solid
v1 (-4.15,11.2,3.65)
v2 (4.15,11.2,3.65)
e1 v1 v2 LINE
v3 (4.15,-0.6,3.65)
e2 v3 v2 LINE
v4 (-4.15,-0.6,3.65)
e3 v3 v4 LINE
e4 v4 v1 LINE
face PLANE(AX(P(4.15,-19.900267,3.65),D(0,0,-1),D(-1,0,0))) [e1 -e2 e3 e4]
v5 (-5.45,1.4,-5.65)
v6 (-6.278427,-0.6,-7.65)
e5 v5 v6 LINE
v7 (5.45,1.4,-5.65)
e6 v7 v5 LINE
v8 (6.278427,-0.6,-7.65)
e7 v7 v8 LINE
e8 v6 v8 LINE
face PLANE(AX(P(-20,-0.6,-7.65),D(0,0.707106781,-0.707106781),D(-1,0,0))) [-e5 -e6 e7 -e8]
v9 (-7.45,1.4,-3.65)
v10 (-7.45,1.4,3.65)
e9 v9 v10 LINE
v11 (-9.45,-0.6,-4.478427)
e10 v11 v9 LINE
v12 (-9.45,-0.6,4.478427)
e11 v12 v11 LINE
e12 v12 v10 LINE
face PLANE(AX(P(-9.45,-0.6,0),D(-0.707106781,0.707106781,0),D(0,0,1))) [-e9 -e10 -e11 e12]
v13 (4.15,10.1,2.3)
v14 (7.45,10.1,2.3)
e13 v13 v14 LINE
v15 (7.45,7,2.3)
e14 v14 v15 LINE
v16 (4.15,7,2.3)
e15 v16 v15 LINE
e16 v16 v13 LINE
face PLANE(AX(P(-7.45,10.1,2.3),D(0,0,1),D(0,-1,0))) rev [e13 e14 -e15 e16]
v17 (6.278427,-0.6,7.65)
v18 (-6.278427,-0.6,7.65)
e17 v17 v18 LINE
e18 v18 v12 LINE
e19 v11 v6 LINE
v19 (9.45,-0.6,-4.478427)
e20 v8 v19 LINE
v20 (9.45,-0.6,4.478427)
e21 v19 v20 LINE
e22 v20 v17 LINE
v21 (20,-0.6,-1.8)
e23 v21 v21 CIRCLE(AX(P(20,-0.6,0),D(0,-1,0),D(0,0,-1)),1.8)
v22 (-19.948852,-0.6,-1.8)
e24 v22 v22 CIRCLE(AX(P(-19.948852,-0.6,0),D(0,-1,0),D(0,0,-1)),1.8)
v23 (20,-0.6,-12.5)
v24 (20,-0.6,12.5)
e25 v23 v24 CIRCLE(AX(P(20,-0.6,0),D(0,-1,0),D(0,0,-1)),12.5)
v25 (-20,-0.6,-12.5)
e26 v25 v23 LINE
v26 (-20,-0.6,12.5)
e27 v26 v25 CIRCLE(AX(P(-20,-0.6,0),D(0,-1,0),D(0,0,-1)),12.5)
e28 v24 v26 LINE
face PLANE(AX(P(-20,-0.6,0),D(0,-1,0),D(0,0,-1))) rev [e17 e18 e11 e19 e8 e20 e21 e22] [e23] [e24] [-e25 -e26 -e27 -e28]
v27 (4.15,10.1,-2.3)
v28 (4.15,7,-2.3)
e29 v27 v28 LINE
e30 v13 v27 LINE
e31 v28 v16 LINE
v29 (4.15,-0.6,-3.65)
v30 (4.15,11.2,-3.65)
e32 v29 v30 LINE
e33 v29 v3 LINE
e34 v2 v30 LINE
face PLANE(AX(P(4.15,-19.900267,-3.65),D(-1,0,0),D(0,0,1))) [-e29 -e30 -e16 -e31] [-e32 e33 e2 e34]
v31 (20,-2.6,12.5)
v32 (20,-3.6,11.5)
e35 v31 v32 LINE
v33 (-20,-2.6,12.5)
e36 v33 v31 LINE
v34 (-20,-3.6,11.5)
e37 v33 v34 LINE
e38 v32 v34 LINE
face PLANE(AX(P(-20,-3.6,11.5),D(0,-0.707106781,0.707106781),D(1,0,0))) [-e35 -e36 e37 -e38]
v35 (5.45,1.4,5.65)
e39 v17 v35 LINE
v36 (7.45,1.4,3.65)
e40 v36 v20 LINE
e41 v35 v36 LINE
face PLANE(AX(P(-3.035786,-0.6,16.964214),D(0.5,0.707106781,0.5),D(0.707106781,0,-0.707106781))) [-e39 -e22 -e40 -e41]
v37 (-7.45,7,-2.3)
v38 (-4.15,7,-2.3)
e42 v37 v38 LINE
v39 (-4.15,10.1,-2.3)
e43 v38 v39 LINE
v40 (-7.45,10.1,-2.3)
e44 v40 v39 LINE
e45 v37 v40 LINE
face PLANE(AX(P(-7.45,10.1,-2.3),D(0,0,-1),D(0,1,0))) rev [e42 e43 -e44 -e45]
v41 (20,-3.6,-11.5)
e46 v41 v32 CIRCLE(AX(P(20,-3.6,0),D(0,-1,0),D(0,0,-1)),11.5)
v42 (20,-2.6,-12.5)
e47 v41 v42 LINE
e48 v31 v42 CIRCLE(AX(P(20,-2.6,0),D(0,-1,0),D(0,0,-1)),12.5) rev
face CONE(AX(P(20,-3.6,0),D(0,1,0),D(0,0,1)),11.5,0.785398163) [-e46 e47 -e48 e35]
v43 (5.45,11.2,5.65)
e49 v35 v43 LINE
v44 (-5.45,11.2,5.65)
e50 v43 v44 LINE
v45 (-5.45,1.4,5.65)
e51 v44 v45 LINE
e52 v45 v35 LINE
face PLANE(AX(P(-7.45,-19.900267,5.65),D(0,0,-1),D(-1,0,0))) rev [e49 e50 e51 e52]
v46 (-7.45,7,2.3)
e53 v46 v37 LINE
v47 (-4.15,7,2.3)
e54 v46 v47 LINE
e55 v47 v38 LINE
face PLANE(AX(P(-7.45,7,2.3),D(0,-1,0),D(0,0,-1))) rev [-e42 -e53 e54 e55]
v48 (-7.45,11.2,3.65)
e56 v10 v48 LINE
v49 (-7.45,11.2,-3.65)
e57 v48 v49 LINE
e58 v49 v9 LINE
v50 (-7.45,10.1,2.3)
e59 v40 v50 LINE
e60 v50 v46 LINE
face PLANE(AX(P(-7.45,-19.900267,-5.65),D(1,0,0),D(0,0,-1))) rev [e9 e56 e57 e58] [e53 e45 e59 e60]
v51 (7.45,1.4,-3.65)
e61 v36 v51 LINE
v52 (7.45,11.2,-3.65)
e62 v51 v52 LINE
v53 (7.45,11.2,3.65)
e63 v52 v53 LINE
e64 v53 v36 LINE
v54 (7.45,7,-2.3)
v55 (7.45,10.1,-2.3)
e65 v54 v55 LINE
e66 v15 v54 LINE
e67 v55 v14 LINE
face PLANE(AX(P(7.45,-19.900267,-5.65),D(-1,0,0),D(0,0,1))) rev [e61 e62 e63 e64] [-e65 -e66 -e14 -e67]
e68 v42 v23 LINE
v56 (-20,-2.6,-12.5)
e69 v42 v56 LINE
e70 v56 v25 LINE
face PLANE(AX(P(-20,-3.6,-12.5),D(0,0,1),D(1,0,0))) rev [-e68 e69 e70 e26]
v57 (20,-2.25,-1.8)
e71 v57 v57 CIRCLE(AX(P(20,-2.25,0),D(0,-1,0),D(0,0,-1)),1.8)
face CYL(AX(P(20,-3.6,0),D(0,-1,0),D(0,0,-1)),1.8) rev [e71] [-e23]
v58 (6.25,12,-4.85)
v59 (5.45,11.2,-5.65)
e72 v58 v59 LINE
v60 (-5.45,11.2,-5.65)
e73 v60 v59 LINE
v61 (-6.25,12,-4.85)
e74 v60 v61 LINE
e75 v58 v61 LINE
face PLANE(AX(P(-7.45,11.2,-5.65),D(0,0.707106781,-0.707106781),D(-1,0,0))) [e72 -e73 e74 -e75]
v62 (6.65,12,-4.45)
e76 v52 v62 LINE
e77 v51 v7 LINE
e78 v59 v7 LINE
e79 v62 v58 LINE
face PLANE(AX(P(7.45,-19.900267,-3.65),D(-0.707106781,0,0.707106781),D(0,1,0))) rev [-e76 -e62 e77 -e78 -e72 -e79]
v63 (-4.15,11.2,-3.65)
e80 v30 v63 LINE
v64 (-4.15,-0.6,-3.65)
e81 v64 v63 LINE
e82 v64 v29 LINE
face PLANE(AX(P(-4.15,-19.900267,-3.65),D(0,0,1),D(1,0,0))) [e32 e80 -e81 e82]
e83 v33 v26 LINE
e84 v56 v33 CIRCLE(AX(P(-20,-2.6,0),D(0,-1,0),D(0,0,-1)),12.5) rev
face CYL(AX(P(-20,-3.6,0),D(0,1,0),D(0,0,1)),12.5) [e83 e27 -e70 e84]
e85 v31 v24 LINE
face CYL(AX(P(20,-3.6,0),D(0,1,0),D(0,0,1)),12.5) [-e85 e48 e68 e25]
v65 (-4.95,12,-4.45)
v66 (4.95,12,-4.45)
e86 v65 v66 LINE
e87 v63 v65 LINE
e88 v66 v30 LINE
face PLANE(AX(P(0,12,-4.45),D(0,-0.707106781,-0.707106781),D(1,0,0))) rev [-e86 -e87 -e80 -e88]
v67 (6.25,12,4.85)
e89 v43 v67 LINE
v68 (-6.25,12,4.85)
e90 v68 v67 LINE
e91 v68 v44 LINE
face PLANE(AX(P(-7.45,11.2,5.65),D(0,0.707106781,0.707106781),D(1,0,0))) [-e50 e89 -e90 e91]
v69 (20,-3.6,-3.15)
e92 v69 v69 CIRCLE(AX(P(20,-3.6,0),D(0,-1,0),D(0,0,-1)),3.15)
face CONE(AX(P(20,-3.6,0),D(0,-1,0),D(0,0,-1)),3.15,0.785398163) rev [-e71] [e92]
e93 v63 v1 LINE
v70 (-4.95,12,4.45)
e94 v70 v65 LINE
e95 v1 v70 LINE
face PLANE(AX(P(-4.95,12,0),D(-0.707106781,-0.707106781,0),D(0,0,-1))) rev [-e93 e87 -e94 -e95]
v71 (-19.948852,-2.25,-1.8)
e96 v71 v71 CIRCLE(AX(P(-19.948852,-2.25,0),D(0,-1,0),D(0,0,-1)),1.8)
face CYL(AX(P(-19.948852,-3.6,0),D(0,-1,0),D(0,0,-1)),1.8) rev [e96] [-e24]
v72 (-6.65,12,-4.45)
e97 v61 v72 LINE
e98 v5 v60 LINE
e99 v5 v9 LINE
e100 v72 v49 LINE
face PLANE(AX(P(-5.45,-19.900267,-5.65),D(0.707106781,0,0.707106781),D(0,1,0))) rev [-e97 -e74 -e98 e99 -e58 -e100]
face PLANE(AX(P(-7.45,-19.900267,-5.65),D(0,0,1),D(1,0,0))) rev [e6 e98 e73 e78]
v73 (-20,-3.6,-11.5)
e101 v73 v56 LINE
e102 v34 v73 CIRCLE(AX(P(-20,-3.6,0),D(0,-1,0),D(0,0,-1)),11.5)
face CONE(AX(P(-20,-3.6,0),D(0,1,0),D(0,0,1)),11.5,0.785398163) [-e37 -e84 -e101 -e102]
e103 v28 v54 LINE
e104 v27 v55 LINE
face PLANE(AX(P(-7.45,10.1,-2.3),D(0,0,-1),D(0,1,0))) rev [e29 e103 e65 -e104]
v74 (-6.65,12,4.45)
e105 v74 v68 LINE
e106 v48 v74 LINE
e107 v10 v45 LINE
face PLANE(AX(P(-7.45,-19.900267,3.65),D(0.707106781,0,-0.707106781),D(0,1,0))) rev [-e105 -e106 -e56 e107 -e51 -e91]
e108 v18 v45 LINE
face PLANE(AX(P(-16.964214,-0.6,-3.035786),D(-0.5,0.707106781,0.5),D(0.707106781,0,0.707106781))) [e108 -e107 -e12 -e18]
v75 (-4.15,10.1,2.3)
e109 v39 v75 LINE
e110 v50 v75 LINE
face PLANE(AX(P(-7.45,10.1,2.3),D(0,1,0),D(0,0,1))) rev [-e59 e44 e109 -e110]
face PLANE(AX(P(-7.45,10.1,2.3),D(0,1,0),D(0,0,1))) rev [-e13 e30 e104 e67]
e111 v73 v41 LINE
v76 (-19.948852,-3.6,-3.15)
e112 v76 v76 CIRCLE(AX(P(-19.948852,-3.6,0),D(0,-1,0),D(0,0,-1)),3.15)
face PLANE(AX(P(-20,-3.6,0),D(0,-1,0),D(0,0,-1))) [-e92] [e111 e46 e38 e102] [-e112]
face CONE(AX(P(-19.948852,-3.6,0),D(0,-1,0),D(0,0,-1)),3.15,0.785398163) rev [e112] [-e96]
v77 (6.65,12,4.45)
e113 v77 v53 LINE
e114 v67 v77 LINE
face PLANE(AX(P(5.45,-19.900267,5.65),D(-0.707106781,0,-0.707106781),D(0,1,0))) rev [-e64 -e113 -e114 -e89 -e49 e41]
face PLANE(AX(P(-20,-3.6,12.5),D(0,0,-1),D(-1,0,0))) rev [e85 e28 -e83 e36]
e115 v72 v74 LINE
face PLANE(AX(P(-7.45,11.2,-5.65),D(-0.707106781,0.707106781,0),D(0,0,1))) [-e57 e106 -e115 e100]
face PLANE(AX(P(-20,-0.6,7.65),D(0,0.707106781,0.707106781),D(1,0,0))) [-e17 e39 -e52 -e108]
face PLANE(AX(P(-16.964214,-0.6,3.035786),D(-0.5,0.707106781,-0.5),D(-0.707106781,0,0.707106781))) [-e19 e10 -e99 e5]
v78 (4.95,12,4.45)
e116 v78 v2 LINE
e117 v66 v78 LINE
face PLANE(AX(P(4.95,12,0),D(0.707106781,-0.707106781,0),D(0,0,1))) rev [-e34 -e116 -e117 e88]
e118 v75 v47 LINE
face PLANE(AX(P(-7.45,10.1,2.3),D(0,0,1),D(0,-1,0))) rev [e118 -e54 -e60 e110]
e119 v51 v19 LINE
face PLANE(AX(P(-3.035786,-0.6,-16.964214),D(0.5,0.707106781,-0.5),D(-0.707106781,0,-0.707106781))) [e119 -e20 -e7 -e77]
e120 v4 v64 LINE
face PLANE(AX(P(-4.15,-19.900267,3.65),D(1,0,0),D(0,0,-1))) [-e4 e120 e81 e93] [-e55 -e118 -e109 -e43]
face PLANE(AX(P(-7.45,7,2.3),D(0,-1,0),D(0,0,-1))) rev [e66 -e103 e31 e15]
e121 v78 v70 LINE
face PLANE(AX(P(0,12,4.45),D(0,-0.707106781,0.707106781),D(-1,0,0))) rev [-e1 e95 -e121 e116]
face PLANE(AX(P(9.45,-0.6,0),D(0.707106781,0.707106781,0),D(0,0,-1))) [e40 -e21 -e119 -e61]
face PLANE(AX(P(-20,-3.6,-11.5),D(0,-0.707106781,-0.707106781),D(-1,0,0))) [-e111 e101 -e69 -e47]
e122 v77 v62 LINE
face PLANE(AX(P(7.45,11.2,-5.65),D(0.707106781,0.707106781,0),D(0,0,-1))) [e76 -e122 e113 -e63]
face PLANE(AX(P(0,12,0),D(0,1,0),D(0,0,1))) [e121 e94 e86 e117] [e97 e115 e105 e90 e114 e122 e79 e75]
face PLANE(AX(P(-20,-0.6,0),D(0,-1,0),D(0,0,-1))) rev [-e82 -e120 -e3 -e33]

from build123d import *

# Parameters (mm, degrees)
SKETCH2_W                                       = 14.9
SKETCH2_H                                       = 11.3
SKETCH2_W_2                                     = 8.3
SKETCH2_H_2                                     = 7.3
BOSS_EXTRUDE1_DEPTH                             = 12.6
CUT_EXTRUDE1_DEPTH                              = 16.212659202
CUT_EXTRUDE1_DEPTH_BACK                         = 16.212659202
SKETCH4_W                                       = 4.6
SKETCH4_H                                       = 3.1
BOSS_EXTRUDE2_DEPTH                             = 3
CHAMFER1_SIZE                                   = 1
CHAMFER2_SIZE                                   = 0.8
CHAMFER3_SIZE                                   = 2
CSK_FOR_M3_FLAT_HEAD_MACHINE_SCREW1_D           = 3.6
CSK_FOR_M3_FLAT_HEAD_MACHINE_SCREW1_CSINK_D     = 6.3
CSK_FOR_M3_FLAT_HEAD_MACHINE_SCREW1_CSINK_ANGLE = 90
CHAMFER4_SIZE                                   = 2


with BuildPart() as part:
    # Sketch2 → Boss-Extrude1 (new body)
    with BuildSketch(Plane.XZ.offset(-12)):
        Rectangle(SKETCH2_W, SKETCH2_H)
        Rectangle(SKETCH2_W_2, SKETCH2_H_2, mode=Mode.SUBTRACT)
    extrude(amount=BOSS_EXTRUDE1_DEPTH)

    # Sketch4 → Cut-Extrude1 (cut, two sides: drawn at the far end of the back side and taken through both)
    with BuildSketch(Plane(origin=(0, 0, 0), x_dir=(0, 0, -1), z_dir=(1, 0, 0)).offset(-CUT_EXTRUDE1_DEPTH_BACK)):
        with Locations((0, 8.55)):
            Rectangle(SKETCH4_W, SKETCH4_H)
    extrude(amount=CUT_EXTRUDE1_DEPTH + CUT_EXTRUDE1_DEPTH_BACK, mode=Mode.SUBTRACT)

    # Sketch5 → Boss-Extrude2 (add)
    with BuildSketch(Plane.XZ.offset(0.6)):
        with BuildLine():
            Line((-20, 12.5), (20, 12.5))
            ThreePointArc((20, 12.5), (32.5, 0), (20, -12.5))
            Line((20, -12.5), (-20, -12.5))
            ThreePointArc((-20, -12.5), (-32.5, 0), (-20, 12.5))
        make_face()
    extrude(amount=BOSS_EXTRUDE2_DEPTH)

    # Chamfer1
    chamfer1_edges = [part.edges().sort_by_distance(p)[0] for p in [
        (-32.5, -3.6, 0),
        (0, -3.6, -12.5),
        (32.5, -3.6, 0),
        (0, -3.6, 12.5),
    ]]
    chamfer(chamfer1_edges, length=CHAMFER1_SIZE)

    # Chamfer2
    chamfer2_edges = [part.edges().sort_by_distance(p)[0] for p in [
        (0, 12, -3.65),
        (4.15, 12, 0),
        (0, 12, 3.65),
        (-4.15, 12, 0),
        (0, 12, -5.65),
        (-7.45, 12, 0),
        (0, 12, 5.65),
        (7.45, 12, 0),
    ]]
    chamfer(chamfer2_edges, length=CHAMFER2_SIZE)

    # Chamfer3
    # the kernel refuses this chamfer: 2 mm, written as the material it takes off along each edge
    with BuildSketch(Plane(origin=(-7.45, 16.343365976, 5.65), x_dir=(-0.027495876610586053, 0, -0.9996219169112968), z_dir=(0, -1, 0)), Plane(origin=(7.45, 16.343365976, 5.65), x_dir=(-0.9996219169112968, 0, 0.027495876610586487), z_dir=(0, -1, 0))) as chamfer3_piece_1:
        Polygon((CHAMFER3_SIZE * 0.999621916911, CHAMFER3_SIZE * 0.0274958766106), (-CHAMFER3_SIZE * 0.0274958766106, CHAMFER3_SIZE * 0.999621916911), (0, 0), align=None)
    extrude(amount=16.943365976, mode=Mode.SUBTRACT)
    with BuildSketch(Plane(origin=(-7.45, 16.343365976, -5.65), x_dir=(-0.027495876610586924, 0, 0.9996219169112968), z_dir=(0, -1, 0)), Plane(origin=(7.45, 16.343365976, -5.65), x_dir=(-0.9996219169112968, 0, -0.027495876610586487), z_dir=(0, -1, 0))) as chamfer3_piece_2:
        Polygon((CHAMFER3_SIZE * 0.999621916911, -CHAMFER3_SIZE * 0.0274958766106), (-CHAMFER3_SIZE * 0.0274958766106, -CHAMFER3_SIZE * 0.999621916911), (0, 0), align=None)
    extrude(amount=16.943365976, mode=Mode.SUBTRACT)

    # CSK for M3 Flat Head Machine Screw1 (through all)
    with Locations(Plane(origin=(0, -3.6, 0), x_dir=(-1, 0, 0), z_dir=(0, -1, 0))):
        with Locations((-20, 0), (19.948852039, 0)):
            CounterSinkHole(CSK_FOR_M3_FLAT_HEAD_MACHINE_SCREW1_D / 2, CSK_FOR_M3_FLAT_HEAD_MACHINE_SCREW1_CSINK_D / 2, counter_sink_angle=CSK_FOR_M3_FLAT_HEAD_MACHINE_SCREW1_CSINK_ANGLE)

    # Chamfer4
    chamfer4_edges = [part.edges().sort_by_distance(p)[0] for p in [
        (-7.45, -0.6, 0),
        (0, -0.6, 5.65),
        (0, -0.6, -5.65),
        (7.45, -0.6, 0),
        (-6.45, -0.6, 4.65),
        (-6.45, -0.6, -4.65),
        (6.45, -0.6, -4.65),
        (6.45, -0.6, 4.65),
    ]]
    chamfer(chamfer4_edges, length=CHAMFER4_SIZE)


solid = part.part
